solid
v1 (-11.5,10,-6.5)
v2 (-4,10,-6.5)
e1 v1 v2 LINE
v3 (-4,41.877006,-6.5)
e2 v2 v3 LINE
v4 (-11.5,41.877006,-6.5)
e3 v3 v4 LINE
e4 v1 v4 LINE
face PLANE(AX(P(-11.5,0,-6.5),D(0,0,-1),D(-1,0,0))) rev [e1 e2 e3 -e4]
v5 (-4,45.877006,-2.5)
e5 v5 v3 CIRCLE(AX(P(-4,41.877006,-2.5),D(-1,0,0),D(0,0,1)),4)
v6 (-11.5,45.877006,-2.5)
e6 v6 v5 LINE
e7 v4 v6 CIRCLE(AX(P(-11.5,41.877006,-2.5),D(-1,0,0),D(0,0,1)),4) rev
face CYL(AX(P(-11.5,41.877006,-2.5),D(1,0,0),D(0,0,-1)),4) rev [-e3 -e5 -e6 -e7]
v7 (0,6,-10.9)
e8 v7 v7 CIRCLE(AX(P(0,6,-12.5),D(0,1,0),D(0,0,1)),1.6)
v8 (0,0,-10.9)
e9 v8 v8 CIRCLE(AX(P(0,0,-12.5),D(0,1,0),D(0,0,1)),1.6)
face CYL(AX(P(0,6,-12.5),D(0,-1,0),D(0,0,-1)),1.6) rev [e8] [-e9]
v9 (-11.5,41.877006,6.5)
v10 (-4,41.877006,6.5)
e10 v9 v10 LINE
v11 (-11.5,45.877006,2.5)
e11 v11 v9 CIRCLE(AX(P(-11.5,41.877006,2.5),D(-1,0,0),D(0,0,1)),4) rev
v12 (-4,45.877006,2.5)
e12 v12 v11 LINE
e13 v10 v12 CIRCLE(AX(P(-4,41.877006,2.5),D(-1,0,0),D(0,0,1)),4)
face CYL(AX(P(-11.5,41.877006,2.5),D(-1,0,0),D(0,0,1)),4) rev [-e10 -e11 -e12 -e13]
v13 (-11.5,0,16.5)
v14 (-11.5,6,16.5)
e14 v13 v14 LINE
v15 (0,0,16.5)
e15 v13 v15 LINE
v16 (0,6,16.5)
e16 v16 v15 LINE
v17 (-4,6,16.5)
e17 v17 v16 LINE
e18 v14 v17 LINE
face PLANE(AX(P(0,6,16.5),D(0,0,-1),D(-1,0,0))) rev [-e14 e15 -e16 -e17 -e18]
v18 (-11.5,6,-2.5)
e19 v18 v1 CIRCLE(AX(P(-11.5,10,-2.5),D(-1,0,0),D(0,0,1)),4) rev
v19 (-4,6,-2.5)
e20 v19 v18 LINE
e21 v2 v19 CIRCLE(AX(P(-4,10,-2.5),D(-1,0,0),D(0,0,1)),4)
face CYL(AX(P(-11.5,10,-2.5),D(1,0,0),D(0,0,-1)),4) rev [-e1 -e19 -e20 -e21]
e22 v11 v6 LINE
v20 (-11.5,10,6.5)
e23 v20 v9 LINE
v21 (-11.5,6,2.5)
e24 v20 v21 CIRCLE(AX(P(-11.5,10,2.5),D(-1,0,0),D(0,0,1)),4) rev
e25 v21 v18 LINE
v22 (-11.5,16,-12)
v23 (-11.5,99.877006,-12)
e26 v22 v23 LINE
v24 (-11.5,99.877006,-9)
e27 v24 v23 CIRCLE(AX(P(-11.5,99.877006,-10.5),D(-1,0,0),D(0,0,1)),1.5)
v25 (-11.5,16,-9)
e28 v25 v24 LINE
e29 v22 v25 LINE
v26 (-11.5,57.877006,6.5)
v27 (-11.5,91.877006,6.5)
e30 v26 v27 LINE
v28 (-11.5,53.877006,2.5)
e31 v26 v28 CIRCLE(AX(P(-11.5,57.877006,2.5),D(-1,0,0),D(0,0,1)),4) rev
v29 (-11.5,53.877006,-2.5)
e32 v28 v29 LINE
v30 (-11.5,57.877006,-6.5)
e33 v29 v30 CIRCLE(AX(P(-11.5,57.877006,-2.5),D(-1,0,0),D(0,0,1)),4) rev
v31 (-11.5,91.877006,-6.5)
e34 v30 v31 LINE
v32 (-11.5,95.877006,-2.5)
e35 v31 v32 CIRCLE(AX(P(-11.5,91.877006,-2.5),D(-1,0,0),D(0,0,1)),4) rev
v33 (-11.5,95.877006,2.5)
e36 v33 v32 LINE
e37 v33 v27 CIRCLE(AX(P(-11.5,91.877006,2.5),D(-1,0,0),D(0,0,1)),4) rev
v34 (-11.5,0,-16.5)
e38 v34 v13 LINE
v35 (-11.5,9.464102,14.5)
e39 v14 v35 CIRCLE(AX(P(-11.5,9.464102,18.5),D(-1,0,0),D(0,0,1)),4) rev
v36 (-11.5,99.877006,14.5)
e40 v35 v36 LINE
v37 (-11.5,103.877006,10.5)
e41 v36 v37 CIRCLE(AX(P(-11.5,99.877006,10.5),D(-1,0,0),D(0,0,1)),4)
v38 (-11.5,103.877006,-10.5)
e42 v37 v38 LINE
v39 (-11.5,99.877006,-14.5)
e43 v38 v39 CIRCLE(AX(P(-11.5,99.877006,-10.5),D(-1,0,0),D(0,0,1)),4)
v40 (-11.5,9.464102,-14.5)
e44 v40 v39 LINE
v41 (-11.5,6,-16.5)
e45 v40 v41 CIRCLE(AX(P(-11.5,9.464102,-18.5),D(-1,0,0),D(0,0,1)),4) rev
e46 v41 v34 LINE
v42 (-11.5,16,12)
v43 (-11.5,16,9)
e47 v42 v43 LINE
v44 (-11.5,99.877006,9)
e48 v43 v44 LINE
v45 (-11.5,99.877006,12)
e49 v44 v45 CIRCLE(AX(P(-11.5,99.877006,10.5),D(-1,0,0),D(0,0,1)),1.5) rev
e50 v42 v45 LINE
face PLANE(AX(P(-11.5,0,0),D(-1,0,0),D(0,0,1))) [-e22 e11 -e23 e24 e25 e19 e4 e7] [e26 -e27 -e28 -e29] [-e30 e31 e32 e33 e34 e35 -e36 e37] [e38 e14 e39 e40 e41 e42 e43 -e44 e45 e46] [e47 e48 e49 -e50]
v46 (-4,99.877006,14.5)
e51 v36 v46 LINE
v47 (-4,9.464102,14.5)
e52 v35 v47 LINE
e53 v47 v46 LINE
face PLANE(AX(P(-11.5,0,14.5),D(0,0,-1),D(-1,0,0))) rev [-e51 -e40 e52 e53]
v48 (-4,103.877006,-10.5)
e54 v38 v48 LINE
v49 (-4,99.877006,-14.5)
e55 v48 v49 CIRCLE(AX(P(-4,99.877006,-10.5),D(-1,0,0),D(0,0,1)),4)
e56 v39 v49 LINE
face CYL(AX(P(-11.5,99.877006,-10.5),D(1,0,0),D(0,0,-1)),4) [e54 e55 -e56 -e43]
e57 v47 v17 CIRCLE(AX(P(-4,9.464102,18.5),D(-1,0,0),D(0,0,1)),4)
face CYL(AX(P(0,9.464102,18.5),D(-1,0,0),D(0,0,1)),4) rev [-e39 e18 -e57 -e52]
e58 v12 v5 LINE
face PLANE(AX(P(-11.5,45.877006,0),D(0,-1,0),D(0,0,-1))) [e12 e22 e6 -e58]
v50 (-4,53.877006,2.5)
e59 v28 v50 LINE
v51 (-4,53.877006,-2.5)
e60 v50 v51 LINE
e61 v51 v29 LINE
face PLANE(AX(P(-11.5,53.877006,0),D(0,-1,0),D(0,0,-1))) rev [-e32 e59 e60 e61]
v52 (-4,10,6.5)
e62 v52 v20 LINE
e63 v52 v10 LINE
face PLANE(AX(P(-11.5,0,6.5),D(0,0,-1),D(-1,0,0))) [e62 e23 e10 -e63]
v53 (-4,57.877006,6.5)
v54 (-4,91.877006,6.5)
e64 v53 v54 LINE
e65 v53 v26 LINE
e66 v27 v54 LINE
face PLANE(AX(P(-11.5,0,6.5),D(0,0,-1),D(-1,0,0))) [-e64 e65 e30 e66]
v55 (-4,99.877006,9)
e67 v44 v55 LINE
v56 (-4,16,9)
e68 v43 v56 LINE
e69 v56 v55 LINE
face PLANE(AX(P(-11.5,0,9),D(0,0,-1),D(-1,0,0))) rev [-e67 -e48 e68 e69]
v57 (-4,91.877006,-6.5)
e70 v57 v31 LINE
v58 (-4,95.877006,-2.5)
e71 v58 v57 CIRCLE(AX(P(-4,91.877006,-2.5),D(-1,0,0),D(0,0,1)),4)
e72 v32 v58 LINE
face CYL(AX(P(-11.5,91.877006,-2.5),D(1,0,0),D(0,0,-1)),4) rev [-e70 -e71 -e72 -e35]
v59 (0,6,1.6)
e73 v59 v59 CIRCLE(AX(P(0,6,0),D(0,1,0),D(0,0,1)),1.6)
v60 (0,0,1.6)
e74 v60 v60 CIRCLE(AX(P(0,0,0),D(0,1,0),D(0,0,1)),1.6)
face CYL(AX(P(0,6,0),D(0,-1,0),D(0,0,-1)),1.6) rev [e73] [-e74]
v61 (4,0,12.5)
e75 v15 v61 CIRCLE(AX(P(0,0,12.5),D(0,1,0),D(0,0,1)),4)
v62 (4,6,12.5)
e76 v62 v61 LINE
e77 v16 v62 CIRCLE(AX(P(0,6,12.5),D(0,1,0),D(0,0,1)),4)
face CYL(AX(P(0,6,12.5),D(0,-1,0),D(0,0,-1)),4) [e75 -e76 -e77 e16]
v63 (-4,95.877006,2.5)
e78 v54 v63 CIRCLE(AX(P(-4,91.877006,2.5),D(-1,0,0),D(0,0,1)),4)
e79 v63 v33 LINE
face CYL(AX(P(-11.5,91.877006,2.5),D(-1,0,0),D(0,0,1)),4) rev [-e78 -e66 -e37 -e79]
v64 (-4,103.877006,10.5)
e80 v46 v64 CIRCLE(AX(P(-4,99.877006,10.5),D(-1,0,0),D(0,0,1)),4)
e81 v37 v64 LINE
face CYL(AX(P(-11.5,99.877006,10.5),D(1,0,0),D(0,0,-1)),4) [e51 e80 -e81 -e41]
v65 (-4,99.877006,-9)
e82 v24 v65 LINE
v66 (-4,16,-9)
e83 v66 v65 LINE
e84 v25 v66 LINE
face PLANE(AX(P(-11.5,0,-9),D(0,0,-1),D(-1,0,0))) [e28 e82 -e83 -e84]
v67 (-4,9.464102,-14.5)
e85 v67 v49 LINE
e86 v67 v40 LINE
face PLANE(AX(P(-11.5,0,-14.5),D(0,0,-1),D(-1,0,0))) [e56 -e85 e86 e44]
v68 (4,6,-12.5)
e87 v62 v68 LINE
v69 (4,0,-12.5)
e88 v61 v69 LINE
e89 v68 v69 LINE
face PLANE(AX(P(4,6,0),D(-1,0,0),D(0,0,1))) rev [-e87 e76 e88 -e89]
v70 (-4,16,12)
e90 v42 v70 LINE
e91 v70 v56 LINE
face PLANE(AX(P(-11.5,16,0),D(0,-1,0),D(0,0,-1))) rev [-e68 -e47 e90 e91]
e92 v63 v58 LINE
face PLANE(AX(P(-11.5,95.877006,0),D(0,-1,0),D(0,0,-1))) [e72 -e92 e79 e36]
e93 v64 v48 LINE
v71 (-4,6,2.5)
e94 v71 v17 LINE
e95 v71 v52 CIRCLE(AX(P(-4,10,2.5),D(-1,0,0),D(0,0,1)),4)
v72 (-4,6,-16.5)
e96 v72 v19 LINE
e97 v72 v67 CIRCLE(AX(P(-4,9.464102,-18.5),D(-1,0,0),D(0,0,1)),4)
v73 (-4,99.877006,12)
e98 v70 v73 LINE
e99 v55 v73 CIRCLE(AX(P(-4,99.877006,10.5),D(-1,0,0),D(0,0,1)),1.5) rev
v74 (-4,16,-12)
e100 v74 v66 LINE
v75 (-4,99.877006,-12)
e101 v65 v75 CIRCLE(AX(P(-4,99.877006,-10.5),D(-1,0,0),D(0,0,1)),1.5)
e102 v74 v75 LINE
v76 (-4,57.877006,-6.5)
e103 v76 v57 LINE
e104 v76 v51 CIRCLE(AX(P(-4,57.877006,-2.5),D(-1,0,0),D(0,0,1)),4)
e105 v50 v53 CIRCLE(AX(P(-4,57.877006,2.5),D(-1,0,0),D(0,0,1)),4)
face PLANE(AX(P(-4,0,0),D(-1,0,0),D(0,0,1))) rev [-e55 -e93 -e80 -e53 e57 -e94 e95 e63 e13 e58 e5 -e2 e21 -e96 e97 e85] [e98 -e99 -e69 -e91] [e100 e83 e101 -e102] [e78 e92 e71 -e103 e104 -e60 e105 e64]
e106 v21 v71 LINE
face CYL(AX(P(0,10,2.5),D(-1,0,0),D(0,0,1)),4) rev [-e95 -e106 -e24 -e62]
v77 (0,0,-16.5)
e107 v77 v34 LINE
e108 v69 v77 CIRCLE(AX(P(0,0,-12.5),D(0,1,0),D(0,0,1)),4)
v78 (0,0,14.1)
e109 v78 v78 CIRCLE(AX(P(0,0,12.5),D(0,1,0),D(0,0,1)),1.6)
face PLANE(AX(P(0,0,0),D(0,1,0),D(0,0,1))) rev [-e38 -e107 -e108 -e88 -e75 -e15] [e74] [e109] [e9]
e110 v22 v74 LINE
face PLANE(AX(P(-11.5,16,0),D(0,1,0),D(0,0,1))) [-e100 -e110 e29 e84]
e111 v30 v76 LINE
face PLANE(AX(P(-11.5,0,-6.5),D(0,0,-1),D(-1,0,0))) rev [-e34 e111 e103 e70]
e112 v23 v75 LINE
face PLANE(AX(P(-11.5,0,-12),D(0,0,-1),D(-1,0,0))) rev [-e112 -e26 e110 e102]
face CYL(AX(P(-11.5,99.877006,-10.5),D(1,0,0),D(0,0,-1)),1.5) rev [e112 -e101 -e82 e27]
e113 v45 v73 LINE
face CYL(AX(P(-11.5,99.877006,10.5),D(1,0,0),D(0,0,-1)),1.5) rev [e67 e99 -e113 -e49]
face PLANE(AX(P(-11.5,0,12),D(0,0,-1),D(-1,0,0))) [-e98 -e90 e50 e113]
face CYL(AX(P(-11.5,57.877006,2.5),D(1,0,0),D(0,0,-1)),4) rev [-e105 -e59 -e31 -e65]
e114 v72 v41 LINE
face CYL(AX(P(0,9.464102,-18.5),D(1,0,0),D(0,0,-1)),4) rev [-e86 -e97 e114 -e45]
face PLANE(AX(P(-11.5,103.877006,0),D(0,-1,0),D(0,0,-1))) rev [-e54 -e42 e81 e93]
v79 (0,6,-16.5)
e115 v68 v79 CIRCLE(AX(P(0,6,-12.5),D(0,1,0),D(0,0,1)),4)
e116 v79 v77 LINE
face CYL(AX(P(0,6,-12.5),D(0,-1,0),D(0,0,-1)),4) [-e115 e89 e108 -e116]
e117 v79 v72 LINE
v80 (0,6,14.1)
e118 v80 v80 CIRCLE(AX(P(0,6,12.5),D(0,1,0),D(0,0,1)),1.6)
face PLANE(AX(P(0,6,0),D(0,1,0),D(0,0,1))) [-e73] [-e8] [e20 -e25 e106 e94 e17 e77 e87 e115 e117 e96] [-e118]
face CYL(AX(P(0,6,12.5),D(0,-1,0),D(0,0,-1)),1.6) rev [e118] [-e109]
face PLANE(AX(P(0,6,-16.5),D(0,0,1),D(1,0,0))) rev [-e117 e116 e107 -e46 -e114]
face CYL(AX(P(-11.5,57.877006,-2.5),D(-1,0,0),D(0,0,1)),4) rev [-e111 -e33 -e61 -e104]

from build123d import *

# Parameters (mm, degrees)
SKETCH1_R           = 1.6
BOSS_EXTRUDE1_DEPTH = 6
SKETCH2_W           = 2.5
SKETCH2_H           = 42
SKETCH2_H_2         = 8
SKETCH2_H_3         = 6
SKETCH2_W_2         = 13
SKETCH2_W_3         = 2
SKETCH2_W_4         = 3
SKETCH2_H_4         = 10
BOSS_EXTRUDE2_DEPTH = 7.5
FILLET3_R           = 4
FILLET4_R           = 4


with BuildPart() as part:
    # Sketch1 → Boss-Extrude1 (new body)
    with BuildSketch(Plane(origin=(0, 0, 0), x_dir=(1, 0, 0), z_dir=(0, 1, 0))):
        with BuildLine():
            Line((-4, -16.5), (0, -16.5))
            ThreePointArc((0, -16.5), (2.828427125, -15.328427125), (4, -12.5))
            Line((4, -12.5), (4, 12.5))
            ThreePointArc((4, 12.5), (2.828427125, 15.328427125), (0, 16.5))
            Line((0, 16.5), (-4, 16.5))
            Line((-4, 16.5), (-4, -16.5))
        make_face()
        with Locations(Location((0, 12.5, 0), (0, 0, 270))):
            Circle(SKETCH1_R, mode=Mode.SUBTRACT)
        with Locations(Location((0, -12.5, 0), (0, 0, 270))):
            Circle(SKETCH1_R, mode=Mode.SUBTRACT)
        with Locations(Location((0, 0, 0), (0, 0, 270))):
            Circle(SKETCH1_R, mode=Mode.SUBTRACT)
    extrude(amount=BOSS_EXTRUDE1_DEPTH)

    # Sketch2 → Boss-Extrude2 (add)
    with BuildSketch(Plane.ZY.offset(4)):
        with BuildLine():
            Line((14.5, 49.877005851), (14.5, 99.877005851))
            ThreePointArc((14.5, 99.877005851), (13.81662479, 97.640937873), (12, 96.168906607))
            Line((12, 96.168906607), (12, 53.585105094))
            ThreePointArc((12, 53.585105094), (13.81662479, 52.113073828), (14.5, 49.877005851))
        make_face()
        with Locations((7.75, 74.877005851)):
            Rectangle(SKETCH2_W, SKETCH2_H)
        with BuildLine():
            ThreePointArc((14.5, 99.877005851), (13.328427125, 102.705432976), (10.5, 103.877005851))
            ThreePointArc((10.5, 103.877005851), (7.671572875, 102.705432976), (6.5, 99.877005851))
            Line((6.5, 99.877005851), (6.5, 95.877005851))
            Line((6.5, 95.877005851), (9, 95.877005851))
            Line((9, 95.877005851), (9, 99.877005851))
            ThreePointArc((9, 99.877005851), (10.5, 101.377005851), (12, 99.877005851))
            Line((12, 99.877005851), (12, 96.168906607))
            ThreePointArc((12, 96.168906607), (13.81662479, 97.640937873), (14.5, 99.877005851))
        make_face()
        with BuildLine():
            Line((10.5, 103.877005851), (-10.5, 103.877005851))
            ThreePointArc((-10.5, 103.877005851), (-7.671572875, 102.705432976), (-6.5, 99.877005851))
            Line((-6.5, 99.877005851), (-6.5, 95.877005851))
            Line((-6.5, 95.877005851), (6.5, 95.877005851))
            Line((6.5, 95.877005851), (6.5, 99.877005851))
            ThreePointArc((6.5, 99.877005851), (7.671572875, 102.705432976), (10.5, 103.877005851))
        make_face()
        with BuildLine():
            ThreePointArc((-10.5, 103.877005851), (-13.328427125, 102.705432976), (-14.5, 99.877005851))
            ThreePointArc((-14.5, 99.877005851), (-13.81662479, 97.640937873), (-12, 96.168906607))
            Line((-12, 96.168906607), (-12, 99.877005851))
            ThreePointArc((-12, 99.877005851), (-10.5, 101.377005851), (-9, 99.877005851))
            Line((-9, 99.877005851), (-9, 95.877005851))
            Line((-9, 95.877005851), (-6.5, 95.877005851))
            Line((-6.5, 95.877005851), (-6.5, 99.877005851))
            ThreePointArc((-6.5, 99.877005851), (-7.671572875, 102.705432976), (-10.5, 103.877005851))
        make_face()
        with BuildLine():
            Line((-14.5, 99.877005851), (-14.5, 49.877005807))
            ThreePointArc((-14.5, 49.877005807), (-13.816624803, 52.11307381), (-12, 53.585105094))
            Line((-12, 53.585105094), (-12, 96.168906607))
            ThreePointArc((-12, 96.168906607), (-13.81662479, 97.640937873), (-14.5, 99.877005851))
        make_face()
        with Locations((-7.75, 74.877005851)):
            Rectangle(SKETCH2_W, SKETCH2_H)
        with Locations((7.75, 49.877005851)):
            Rectangle(SKETCH2_W, SKETCH2_H_2)
        with BuildLine():
            ThreePointArc((12, 46.168906607), (13.81662479, 47.640937873), (14.5, 49.877005851))
            ThreePointArc((14.5, 49.877005851), (13.81662479, 52.113073828), (12, 53.585105094))
            Line((12, 53.585105094), (12, 46.168906607))
        make_face()
        with Locations((-7.75, 49.877005851)):
            Rectangle(SKETCH2_W, SKETCH2_H_2)
        with BuildLine():
            ThreePointArc((-12, 53.585105094), (-13.816624803, 52.11307381), (-14.5, 49.877005807))
            ThreePointArc((-14.5, 49.877005807), (-13.816624778, 47.640937855), (-12, 46.168906607))
            Line((-12, 46.168906607), (-12, 53.585105094))
        make_face()
        with BuildLine():
            Line((-14.5, 49.877005807), (-14.5, 6))
            Line((-14.5, 6), (-12, 6))
            Line((-12, 6), (-12, 16))
            Line((-12, 16), (-12, 46.168906607))
            ThreePointArc((-12, 46.168906607), (-13.816624778, 47.640937855), (-14.5, 49.877005807))
        make_face()
        with BuildLine():
            Line((12, 16), (12, 6))
            Line((12, 6), (14.5, 6))
            Line((14.5, 6), (14.5, 49.877005851))
            ThreePointArc((14.5, 49.877005851), (13.81662479, 47.640937873), (12, 46.168906607))
            Line((12, 46.168906607), (12, 16))
        make_face()
        Polygon((6.5, 45.877005851), (6.5, 6), (9, 6), (9, 16), (9, 45.877005851), align=None)
        with Locations((13.25, 3)):
            Rectangle(SKETCH2_W, SKETCH2_H_3)
        with Locations((7.75, 3)):
            Rectangle(SKETCH2_W, SKETCH2_H_3)
        with Locations((-7.75, 3)):
            Rectangle(SKETCH2_W, SKETCH2_H_3)
        with Locations((-13.25, 3)):
            Rectangle(SKETCH2_W, SKETCH2_H_3)
        Polygon((-9, 6), (-6.5, 6), (-6.5, 45.877005851), (-9, 45.877005851), (-9, 16), align=None)
        with Locations((0, 3)):
            Rectangle(SKETCH2_W_2, SKETCH2_H_3)
        with Locations((-15.5, 3)):
            Rectangle(SKETCH2_W_3, SKETCH2_H_3)
        with Locations((-10.5, 3)):
            Rectangle(SKETCH2_W_4, SKETCH2_H_3)
        with Locations((15.5, 3)):
            Rectangle(SKETCH2_W_3, SKETCH2_H_3)
        with Locations((10.5, 3)):
            Rectangle(SKETCH2_W_4, SKETCH2_H_3)
        with Locations((0, 49.877005851)):
            Rectangle(SKETCH2_W_2, SKETCH2_H_2)
        with Locations((-10.5, 11)):
            Rectangle(SKETCH2_W_4, SKETCH2_H_4)
        with Locations((10.5, 11)):
            Rectangle(SKETCH2_W_4, SKETCH2_H_4)
    extrude(amount=BOSS_EXTRUDE2_DEPTH)

    # Fillet3
    # the kernel refuses this fillet: 4 mm, written as the material it adds along each edge
    with BuildSketch(Plane(origin=(-4, 6, 6.5), x_dir=(0, 0, -1), z_dir=(-1, 0, 0))) as fillet3_piece_1:
        with BuildLine():
            CenterArc((FILLET3_R, -FILLET3_R), FILLET3_R, 90, 90)
            Line((0, -FILLET3_R), (-FILLET3_R * 0.02, -FILLET3_R))
            Line((-FILLET3_R * 0.02, -FILLET3_R), (-FILLET3_R * 0.02, FILLET3_R * 0.02))
            Line((-FILLET3_R * 0.02, FILLET3_R * 0.02), (FILLET3_R, FILLET3_R * 0.02))
            Line((FILLET3_R, FILLET3_R * 0.02), (FILLET3_R, 0))
        make_face()
    extrude(amount=7.5)
    with BuildSketch(Plane(origin=(-4, 6, -14.5), x_dir=(0, 0, -1), z_dir=(-1, 0, 0))) as fillet3_piece_2:
        with BuildLine():
            CenterArc((4, -3.464101615), FILLET3_R, 120, 60)
            Line((0, -3.464101615), (-0.08, -3.464101615))
            Line((-0.08, -3.464101615), (-0.08, 0))
            Line((-0.08, 0), (0, 0.08))
            ThreePointArc((0, 0.08), (1, 0.08), (1.96, 0.069282032))
            Line((1.96, 0.069282032), (2, 0))
        make_face()
    extrude(amount=7.5)
    with BuildSketch(Plane(origin=(-4, 6, 14.5), x_dir=(0, 0, 1), z_dir=(-1, 0, 0))) as fillet3_piece_3:
        with BuildLine():
            CenterArc((4, 3.464101615), FILLET3_R, 180, 60)
            Line((0, 3.464101615), (-0.08, 3.464101615))
            Line((-0.08, 3.464101615), (-0.08, 0))
            Line((-0.08, 0), (0, -0.08))
            ThreePointArc((0, -0.08), (1, -0.08), (1.96, -0.069282032))
            Line((1.96, -0.069282032), (2, 0))
        make_face()
    extrude(amount=7.5)
    with BuildSketch(Plane(origin=(-4, 6, -6.5), x_dir=(0, 0, 1), z_dir=(-1, 0, 0))) as fillet3_piece_4:
        with BuildLine():
            CenterArc((FILLET3_R, FILLET3_R), FILLET3_R, 180, 90)
            Line((0, FILLET3_R), (-FILLET3_R * 0.02, FILLET3_R))
            Line((-FILLET3_R * 0.02, FILLET3_R), (-FILLET3_R * 0.02, -FILLET3_R * 0.02))
            Line((-FILLET3_R * 0.02, -FILLET3_R * 0.02), (FILLET3_R, -FILLET3_R * 0.02))
            Line((FILLET3_R, -FILLET3_R * 0.02), (FILLET3_R, 0))
        make_face()
    extrude(amount=7.5)

    # Fillet4
    fillet4_edges = [part.edges().sort_by_distance(p)[0] for p in [
        (-7.75, 45.877005851, -6.5),
        (-7.75, 45.877005851, 6.5),
        (-7.75, 95.877005851, -6.5),
        (-7.75, 95.877005851, 6.5),
        (-7.75, 53.877005851, 6.5),
        (-7.75, 53.877005851, -6.5),
    ]]
    fillet(fillet4_edges, radius=FILLET4_R)


solid = part.part
